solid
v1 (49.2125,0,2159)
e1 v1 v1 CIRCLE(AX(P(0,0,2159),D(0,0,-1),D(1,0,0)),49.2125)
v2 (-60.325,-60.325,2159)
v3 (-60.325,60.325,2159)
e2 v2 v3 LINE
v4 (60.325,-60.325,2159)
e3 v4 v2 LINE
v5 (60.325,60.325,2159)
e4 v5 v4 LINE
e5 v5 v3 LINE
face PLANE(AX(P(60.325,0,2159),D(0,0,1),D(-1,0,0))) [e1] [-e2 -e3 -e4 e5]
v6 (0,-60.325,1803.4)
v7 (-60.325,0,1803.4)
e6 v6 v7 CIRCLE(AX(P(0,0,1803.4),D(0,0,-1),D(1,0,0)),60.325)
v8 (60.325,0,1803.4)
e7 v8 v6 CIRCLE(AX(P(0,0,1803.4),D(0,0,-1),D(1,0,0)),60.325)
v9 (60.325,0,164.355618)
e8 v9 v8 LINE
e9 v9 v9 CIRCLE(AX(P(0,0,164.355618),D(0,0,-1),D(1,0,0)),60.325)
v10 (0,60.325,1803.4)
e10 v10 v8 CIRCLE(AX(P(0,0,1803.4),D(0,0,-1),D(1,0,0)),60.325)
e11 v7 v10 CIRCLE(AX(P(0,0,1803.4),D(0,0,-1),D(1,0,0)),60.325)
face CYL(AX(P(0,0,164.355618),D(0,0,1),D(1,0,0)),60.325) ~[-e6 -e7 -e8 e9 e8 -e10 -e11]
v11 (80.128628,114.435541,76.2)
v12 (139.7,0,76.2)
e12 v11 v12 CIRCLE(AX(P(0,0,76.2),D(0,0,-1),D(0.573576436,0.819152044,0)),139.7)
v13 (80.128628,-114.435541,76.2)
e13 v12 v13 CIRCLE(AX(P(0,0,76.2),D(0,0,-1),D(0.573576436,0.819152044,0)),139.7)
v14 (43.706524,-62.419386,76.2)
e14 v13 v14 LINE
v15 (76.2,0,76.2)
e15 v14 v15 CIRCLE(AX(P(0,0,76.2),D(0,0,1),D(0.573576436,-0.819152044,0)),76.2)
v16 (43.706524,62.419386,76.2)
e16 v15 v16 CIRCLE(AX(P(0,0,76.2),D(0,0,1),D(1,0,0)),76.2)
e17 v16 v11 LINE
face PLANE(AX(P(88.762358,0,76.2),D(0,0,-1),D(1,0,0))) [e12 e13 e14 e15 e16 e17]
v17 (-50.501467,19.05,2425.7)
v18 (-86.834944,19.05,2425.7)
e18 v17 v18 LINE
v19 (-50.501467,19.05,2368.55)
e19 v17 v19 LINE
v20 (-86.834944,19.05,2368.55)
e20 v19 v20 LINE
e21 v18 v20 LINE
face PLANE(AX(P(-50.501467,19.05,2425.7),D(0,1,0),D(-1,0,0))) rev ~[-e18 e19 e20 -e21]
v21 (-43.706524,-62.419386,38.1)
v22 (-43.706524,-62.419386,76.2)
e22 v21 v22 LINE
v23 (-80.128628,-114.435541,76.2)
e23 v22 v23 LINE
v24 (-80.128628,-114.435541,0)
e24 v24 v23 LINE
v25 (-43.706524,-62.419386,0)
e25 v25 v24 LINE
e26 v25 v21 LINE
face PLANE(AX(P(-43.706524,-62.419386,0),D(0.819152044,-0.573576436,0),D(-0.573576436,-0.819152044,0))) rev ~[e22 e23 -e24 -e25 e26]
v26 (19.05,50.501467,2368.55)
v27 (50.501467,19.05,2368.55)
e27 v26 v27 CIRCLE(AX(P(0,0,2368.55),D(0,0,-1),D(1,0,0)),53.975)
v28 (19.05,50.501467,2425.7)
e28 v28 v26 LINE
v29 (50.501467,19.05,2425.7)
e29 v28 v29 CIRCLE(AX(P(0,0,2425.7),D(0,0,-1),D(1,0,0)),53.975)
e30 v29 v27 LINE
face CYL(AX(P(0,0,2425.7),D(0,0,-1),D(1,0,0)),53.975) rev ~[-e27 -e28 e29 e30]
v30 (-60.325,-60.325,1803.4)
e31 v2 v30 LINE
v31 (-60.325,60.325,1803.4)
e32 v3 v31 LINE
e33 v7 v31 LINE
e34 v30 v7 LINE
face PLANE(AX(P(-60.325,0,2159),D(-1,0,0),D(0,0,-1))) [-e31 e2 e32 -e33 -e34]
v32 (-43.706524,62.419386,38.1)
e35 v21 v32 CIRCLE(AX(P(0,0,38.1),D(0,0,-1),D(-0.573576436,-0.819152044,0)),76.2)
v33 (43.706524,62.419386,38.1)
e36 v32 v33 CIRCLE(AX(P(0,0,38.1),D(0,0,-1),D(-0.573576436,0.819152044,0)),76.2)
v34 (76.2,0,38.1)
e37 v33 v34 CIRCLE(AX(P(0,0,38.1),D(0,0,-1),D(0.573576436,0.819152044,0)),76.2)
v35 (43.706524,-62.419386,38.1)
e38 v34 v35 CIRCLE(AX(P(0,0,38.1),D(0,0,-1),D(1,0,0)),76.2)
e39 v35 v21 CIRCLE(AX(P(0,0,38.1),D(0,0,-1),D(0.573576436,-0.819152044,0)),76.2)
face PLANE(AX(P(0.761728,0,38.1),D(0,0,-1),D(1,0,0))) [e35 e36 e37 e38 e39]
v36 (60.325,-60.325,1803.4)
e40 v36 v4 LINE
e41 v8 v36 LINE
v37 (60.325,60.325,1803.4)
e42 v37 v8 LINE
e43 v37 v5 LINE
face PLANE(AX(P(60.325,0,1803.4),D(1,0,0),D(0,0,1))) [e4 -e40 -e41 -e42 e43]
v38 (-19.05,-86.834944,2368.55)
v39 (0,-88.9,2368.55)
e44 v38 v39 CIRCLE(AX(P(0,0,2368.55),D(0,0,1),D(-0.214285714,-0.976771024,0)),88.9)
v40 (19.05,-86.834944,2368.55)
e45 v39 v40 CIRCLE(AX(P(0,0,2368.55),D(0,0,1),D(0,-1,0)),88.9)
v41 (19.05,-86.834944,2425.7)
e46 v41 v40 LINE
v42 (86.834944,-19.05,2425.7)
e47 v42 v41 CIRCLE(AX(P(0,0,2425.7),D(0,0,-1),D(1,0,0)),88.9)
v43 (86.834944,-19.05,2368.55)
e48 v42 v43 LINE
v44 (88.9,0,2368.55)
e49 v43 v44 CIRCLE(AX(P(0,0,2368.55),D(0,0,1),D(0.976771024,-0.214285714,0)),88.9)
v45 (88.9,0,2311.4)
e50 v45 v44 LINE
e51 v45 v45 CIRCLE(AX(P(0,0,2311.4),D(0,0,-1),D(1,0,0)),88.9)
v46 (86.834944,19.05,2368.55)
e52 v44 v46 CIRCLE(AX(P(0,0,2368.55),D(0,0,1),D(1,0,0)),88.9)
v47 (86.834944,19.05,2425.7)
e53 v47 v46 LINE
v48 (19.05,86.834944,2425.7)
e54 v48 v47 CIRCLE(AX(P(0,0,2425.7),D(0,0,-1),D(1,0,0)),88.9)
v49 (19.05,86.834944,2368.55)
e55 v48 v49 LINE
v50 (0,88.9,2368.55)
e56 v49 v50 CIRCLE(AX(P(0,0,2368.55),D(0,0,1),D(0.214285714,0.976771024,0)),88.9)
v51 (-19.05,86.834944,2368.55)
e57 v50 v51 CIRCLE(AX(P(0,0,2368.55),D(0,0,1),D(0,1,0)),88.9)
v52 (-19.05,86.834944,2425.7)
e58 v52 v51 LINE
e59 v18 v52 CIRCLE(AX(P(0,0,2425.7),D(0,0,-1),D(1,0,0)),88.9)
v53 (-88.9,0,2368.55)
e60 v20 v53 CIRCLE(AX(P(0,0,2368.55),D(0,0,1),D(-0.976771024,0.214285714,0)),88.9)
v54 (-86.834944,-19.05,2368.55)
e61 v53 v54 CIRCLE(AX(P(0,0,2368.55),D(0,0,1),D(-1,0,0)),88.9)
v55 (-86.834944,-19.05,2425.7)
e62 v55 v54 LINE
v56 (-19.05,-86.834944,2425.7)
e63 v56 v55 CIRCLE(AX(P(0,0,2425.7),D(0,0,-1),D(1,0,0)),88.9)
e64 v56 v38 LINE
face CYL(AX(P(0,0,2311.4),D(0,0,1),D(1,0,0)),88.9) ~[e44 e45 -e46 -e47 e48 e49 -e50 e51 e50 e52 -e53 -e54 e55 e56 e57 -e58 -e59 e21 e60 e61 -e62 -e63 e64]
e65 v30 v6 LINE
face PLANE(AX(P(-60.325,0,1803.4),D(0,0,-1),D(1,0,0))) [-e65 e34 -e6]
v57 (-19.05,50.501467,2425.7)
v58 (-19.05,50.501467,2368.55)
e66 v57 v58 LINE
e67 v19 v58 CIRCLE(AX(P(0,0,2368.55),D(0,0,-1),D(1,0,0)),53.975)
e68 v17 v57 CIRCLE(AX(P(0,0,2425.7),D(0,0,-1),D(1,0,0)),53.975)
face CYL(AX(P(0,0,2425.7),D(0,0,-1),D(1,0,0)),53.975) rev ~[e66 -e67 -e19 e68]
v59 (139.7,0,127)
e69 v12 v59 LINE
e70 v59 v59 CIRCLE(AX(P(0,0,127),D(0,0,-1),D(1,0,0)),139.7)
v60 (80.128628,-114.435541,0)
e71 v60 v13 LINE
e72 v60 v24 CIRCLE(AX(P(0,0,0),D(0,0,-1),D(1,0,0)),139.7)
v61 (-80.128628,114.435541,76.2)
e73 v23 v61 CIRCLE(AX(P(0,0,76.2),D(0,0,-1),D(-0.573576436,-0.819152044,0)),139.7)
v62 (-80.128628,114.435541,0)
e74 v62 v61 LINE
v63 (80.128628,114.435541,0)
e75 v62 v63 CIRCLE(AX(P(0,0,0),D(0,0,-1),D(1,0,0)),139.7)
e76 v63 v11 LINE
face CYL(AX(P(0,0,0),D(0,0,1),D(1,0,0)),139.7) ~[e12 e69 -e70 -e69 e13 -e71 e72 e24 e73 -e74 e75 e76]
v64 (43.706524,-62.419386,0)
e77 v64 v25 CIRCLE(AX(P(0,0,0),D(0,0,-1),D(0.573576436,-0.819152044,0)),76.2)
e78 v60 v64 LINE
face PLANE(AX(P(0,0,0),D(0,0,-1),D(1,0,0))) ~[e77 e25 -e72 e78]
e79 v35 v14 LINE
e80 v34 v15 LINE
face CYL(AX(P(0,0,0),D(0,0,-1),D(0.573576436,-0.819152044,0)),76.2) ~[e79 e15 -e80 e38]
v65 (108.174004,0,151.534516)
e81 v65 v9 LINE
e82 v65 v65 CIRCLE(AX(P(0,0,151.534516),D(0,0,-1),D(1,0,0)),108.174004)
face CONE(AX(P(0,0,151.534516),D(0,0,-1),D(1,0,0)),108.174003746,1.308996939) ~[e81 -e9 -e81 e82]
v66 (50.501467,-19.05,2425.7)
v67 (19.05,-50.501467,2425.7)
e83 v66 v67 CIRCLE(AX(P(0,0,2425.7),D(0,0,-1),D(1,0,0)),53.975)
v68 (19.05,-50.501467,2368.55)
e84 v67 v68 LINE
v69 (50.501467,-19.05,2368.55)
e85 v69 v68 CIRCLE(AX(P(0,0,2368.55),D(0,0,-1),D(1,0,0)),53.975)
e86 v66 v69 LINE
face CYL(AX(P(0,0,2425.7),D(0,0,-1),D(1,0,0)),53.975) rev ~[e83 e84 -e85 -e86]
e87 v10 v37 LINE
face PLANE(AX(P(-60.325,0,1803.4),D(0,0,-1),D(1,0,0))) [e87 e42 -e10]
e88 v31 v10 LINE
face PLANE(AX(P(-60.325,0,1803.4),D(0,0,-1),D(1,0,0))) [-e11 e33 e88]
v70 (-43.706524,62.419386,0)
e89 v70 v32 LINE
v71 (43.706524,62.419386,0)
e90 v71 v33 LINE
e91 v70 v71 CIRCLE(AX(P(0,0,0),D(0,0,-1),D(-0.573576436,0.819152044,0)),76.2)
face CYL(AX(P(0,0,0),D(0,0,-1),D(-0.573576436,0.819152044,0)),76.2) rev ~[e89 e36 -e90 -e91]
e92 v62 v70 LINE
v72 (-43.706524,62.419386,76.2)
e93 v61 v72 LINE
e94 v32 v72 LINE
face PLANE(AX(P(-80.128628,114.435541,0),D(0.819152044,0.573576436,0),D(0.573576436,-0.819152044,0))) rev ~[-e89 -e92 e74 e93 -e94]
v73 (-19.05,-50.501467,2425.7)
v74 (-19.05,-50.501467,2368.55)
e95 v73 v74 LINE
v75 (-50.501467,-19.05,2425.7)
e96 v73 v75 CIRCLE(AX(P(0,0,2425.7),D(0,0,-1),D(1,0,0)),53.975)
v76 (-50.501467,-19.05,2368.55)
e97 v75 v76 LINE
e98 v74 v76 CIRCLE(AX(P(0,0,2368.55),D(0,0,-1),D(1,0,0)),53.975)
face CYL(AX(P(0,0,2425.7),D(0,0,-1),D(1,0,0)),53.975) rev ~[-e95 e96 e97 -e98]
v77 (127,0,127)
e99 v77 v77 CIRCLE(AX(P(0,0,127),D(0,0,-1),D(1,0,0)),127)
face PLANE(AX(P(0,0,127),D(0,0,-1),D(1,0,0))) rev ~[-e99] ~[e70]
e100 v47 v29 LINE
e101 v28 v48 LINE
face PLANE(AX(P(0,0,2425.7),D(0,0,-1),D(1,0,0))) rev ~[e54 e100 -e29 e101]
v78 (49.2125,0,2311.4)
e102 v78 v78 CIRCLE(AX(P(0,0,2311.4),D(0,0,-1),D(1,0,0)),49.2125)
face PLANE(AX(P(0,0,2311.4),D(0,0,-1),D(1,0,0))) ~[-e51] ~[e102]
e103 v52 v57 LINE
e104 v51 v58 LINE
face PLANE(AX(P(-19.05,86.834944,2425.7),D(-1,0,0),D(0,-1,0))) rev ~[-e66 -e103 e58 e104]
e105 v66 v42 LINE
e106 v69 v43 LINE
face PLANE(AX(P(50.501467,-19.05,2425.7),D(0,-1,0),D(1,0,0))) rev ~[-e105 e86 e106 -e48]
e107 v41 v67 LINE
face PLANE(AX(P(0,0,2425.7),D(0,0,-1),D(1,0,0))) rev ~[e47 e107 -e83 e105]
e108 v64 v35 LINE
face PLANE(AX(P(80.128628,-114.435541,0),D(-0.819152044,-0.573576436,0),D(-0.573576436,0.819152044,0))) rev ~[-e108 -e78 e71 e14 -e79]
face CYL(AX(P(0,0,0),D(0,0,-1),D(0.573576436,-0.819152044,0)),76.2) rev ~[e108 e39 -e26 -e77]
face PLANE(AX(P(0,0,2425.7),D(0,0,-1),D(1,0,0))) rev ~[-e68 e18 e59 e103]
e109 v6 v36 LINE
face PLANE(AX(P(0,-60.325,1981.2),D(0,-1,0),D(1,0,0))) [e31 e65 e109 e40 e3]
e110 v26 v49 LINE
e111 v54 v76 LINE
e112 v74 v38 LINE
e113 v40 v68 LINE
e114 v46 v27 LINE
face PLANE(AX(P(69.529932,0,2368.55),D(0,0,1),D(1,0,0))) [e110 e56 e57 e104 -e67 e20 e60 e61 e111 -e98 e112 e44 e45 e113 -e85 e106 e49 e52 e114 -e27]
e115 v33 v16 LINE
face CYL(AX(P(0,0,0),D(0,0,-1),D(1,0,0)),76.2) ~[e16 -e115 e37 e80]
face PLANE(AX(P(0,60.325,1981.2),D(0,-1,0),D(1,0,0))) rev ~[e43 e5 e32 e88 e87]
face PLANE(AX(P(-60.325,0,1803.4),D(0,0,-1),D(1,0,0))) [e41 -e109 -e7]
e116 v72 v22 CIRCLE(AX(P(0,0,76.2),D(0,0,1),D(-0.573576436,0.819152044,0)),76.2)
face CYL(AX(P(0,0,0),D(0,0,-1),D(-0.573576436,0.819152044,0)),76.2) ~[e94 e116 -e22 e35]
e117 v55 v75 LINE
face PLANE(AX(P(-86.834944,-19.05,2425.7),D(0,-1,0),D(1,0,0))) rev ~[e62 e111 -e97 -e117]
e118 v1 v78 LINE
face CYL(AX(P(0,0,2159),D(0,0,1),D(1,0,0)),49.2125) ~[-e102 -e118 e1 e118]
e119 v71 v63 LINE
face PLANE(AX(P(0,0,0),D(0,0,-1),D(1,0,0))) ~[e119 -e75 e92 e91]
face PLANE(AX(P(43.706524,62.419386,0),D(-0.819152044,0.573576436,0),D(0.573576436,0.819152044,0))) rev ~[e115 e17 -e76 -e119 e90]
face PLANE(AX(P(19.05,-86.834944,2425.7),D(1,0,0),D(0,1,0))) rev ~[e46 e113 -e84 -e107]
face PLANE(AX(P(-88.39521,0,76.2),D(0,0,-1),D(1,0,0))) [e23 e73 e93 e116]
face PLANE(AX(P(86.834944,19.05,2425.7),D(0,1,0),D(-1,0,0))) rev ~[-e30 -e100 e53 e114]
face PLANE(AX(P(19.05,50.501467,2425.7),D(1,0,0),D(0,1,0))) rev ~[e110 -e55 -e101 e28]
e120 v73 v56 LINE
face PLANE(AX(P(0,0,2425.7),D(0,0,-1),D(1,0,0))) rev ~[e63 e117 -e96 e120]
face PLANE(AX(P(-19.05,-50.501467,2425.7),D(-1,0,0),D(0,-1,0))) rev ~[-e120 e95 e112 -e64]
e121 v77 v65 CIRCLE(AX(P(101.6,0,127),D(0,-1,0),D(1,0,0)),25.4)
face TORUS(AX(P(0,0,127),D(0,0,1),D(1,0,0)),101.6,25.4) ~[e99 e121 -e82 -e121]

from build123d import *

# Parameters (mm, degrees)
F3_DEPTH        = 38.1
F4_DEPTH        = 76.2
F5_DEPTH        = 60.325
F8_DEPTH        = 57.15
F8_COPIES_COUNT = 4


# Not quite as in the source:
# - a pattern or mirror of a feature is missing from the dataset's text; its kind, count and spacing are read off the source's solid


with BuildPart() as f1:
    # F0 (on Front) → F1 (revolve)
    with BuildSketch(Plane.XZ):
        with BuildLine():
            Line((0, 1803.4), (0, 0))
            Line((0, 0), (139.7, 0))
            Line((139.7, 0), (139.7, 127))
            Line((139.7, 127), (127, 127))
            ThreePointArc((127, 127), (121.7511748434, 142.4625402968), (108.1740037456, 151.5345159877))
            Line((108.1740037456, 151.5345159877), (60.325, 164.3556179))
            Line((60.325, 164.3556179), (60.325, 1803.4))
            Line((60.325, 1803.4), (0, 1803.4))
        make_face()
    revolve(axis=Axis((0, 0, 901.7), (0, 0, -1)))

    # F2 (on face) → F3 (cut)
    with BuildSketch(Plane(origin=(0, 0, 0), x_dir=(1, 0, 0), z_dir=(0, 0, -1))):
        with BuildLine():
            ThreePointArc((43.7065244499, -62.4193857748), (67.5902254882, -35.1852443285), (76.2, 0))
            ThreePointArc((76.2, 0), (67.5902254882, 35.1852443285), (43.7065244499, 62.4193857748))
            ThreePointArc((43.7065244499, 62.4193857748), (0, 76.2), (-43.7065244499, 62.4193857748))
            ThreePointArc((-43.7065244499, 62.4193857748), (-76.2, 0), (-43.7065244499, -62.4193857748))
            ThreePointArc((-43.7065244499, -62.4193857748), (0, -76.2), (43.7065244499, -62.4193857748))
        make_face()
    extrude(amount=-F3_DEPTH, mode=Mode.SUBTRACT)

    # F2 (on face) → F4 (cut)
    with BuildSketch(Plane(origin=(0, 0, 0), x_dir=(1, 0, 0), z_dir=(0, 0, -1))):
        with BuildLine():
            ThreePointArc((-43.7065244499, -62.4193857748), (-76.2, 0), (-43.7065244499, 62.4193857748))
            Line((-43.7065244499, 62.4193857748), (-80.1286281582, 114.4355405872))
            ThreePointArc((-80.1286281582, 114.4355405872), (-139.7, 0), (-80.1286281582, -114.4355405872))
            Line((-80.1286281582, -114.4355405872), (-43.7065244499, -62.4193857748))
        make_face()
        with BuildLine():
            ThreePointArc((43.7065244499, 62.4193857748), (67.5902254882, 35.1852443285), (76.2, 0))
            ThreePointArc((76.2, 0), (67.5902254882, -35.1852443285), (43.7065244499, -62.4193857748))
            Line((43.7065244499, -62.4193857748), (80.1286281582, -114.4355405872))
            ThreePointArc((80.1286281582, -114.4355405872), (123.915413395, -64.5062812689), (139.7, 0))
            ThreePointArc((139.7, 0), (123.915413395, 64.5062812689), (80.1286281582, 114.4355405872))
            Line((80.1286281582, 114.4355405872), (43.7065244499, 62.4193857748))
        make_face()
    extrude(amount=-F4_DEPTH, mode=Mode.SUBTRACT)

    # F0 (on Front) → F5 (join, symmetric)
    with BuildSketch(Plane.XZ):
        Polygon((-60.325, 1803.4), (0, 1803.4), (60.325, 1803.4), (60.325, 2159), (49.2125, 2159), (0, 2159), (-60.325, 2159), align=None)
    extrude(amount=F5_DEPTH, both=True)

    # F0 (on Front) → F6 (revolve)
    with BuildSketch(Plane.XZ):
        Polygon((0, 2159), (49.2125, 2159), (49.2125, 2311.4), (88.9, 2311.4), (88.9, 2425.7), (53.975, 2425.7), (53.975, 2368.55), (0, 2368.55), align=None)
    revolve(axis=Axis((0, 0, 2263.775), (0, 0, -1)))

    # F7 (on face) → F8 (cut, through all)
    with BuildSketch(Plane.XY.offset(2425.7)):
        with BuildLine():
            ThreePointArc((53.975, 0), (53.0995163948, -9.6820443933), (50.5014665629, -19.05))
            Line((50.5014665629, -19.05), (86.834944003, -19.05))
            ThreePointArc((86.834944003, -19.05), (88.3822281962, -9.5808005442), (88.9, 0))
            ThreePointArc((88.9, 0), (88.3822281962, 9.5808005442), (86.834944003, 19.05))
            Line((86.834944003, 19.05), (50.5014665629, 19.05))
            ThreePointArc((50.5014665629, 19.05), (53.0995163948, 9.6820443933), (53.975, 0))
        make_face()
    f8 = extrude(amount=-F8_DEPTH, mode=Mode.SUBTRACT)

    # F8_copies: F8 ×4 about axis
    f8_copies_axis = Axis((0, 0, 0), (0, 0, 1))
    for i in range(1, F8_COPIES_COUNT):
        add(f8.rotate(f8_copies_axis, i * 360 / F8_COPIES_COUNT), mode=Mode.SUBTRACT)


solid = f1.part
